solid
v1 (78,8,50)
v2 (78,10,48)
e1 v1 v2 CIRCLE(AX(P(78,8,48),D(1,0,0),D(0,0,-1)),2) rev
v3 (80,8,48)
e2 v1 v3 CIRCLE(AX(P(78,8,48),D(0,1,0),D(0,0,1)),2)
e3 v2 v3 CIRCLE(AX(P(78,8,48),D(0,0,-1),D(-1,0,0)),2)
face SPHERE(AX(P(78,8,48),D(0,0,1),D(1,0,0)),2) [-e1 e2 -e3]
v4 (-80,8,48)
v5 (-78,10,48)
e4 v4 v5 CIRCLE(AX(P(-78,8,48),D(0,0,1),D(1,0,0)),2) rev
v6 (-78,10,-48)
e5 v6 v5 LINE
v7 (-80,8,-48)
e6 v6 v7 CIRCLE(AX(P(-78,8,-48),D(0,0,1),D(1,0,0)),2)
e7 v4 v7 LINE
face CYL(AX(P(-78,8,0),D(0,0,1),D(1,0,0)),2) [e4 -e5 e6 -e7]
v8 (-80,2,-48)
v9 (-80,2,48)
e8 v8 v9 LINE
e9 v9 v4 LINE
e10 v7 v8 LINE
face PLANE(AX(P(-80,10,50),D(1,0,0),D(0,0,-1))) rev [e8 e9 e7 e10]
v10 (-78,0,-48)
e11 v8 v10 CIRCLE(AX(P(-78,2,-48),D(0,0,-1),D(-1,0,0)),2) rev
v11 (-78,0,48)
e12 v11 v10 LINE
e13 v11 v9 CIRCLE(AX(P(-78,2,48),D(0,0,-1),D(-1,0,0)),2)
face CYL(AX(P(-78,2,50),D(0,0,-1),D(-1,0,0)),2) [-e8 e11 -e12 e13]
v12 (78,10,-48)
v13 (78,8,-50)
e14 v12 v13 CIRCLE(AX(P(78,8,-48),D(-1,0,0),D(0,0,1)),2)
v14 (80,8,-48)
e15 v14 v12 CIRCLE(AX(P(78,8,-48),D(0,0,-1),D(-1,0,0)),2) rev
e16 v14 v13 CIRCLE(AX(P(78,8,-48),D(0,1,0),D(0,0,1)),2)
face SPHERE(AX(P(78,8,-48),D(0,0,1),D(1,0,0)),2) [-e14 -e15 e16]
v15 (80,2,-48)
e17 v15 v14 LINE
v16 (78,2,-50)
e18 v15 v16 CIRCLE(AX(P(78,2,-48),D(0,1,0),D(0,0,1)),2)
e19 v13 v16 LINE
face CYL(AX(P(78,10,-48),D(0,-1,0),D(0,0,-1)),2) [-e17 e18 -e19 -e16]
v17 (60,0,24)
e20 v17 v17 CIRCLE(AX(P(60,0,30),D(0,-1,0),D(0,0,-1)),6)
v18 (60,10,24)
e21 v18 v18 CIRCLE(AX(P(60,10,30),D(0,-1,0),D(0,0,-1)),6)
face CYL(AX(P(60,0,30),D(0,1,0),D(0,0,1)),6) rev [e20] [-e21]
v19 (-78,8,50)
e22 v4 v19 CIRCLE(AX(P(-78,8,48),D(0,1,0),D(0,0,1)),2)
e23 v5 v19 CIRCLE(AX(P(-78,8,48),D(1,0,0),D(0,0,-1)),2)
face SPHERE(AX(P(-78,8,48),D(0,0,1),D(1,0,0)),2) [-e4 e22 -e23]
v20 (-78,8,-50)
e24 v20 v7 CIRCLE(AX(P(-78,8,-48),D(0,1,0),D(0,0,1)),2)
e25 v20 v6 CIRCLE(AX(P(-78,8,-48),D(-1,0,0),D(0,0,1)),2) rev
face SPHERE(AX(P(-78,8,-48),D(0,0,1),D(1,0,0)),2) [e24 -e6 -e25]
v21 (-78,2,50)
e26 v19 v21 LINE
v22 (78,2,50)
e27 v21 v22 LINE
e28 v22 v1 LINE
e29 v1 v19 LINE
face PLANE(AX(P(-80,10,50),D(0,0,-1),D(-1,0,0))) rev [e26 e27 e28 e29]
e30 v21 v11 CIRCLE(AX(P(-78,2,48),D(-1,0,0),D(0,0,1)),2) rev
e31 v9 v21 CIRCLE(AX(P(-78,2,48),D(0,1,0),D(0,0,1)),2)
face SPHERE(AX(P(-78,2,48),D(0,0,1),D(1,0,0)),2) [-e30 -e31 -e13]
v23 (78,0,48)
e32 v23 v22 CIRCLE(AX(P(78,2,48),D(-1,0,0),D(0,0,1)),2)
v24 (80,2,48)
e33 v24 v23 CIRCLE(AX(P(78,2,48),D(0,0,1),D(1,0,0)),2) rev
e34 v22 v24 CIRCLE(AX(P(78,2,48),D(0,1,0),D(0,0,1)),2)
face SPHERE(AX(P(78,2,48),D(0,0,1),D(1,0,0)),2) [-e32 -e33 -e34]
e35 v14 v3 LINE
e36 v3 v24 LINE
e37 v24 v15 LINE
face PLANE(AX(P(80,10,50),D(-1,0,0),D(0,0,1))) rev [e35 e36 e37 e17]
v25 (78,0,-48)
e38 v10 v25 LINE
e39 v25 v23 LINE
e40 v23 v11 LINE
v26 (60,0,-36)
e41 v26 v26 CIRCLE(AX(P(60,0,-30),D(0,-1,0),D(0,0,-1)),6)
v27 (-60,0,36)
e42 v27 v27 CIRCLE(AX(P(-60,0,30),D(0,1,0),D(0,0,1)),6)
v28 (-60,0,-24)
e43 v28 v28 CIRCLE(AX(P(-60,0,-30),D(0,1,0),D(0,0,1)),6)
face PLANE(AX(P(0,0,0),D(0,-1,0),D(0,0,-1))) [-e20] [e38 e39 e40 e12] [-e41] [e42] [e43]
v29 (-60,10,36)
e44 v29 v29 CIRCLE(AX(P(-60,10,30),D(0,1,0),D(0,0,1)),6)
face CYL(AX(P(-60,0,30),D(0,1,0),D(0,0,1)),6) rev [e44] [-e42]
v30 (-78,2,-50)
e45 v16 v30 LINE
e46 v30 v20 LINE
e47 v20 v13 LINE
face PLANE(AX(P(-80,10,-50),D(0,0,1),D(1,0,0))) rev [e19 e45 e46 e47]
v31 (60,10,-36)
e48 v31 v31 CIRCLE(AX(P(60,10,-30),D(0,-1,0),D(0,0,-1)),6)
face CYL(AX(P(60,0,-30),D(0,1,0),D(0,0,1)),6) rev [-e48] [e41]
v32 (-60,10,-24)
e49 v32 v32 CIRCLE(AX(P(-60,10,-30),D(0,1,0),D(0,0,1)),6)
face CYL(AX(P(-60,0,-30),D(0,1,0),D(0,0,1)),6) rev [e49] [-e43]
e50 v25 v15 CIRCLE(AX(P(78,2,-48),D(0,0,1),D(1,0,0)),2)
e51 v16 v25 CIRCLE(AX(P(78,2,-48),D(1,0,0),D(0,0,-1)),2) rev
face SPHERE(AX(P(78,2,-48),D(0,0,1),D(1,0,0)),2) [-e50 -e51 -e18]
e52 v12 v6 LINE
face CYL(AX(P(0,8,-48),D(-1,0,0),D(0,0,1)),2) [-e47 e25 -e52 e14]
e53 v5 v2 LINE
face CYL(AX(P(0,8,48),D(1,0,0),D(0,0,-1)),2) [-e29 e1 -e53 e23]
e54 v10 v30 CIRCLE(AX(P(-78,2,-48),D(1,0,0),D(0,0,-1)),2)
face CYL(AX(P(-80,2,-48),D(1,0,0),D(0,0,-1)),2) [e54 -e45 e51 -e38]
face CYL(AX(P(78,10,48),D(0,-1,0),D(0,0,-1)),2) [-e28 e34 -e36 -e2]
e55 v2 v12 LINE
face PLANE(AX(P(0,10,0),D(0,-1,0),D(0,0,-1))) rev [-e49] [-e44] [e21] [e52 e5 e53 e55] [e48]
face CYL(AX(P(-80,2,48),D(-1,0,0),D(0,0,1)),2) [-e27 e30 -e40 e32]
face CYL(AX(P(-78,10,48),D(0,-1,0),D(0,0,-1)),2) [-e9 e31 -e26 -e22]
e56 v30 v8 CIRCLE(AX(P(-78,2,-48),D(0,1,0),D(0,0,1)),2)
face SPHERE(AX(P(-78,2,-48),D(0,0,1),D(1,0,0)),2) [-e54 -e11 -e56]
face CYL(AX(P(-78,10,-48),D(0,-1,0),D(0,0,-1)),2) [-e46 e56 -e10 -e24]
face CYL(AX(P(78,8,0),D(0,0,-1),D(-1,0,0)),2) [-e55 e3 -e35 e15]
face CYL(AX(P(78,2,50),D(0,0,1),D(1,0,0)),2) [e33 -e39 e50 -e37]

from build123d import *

# Parameters (mm, degrees)
SKETCH1_W           = 160
SKETCH1_H           = 100
BOSS_EXTRUDE1_DEPTH = 10
SKETCH2_R           = 6
CUT_EXTRUDE1_DEPTH  = 95.868329805
FILLET1_R           = 2
FILLET2_R           = 2
FILLET3_R           = 2


with BuildPart() as part:
    # Sketch1 → Boss-Extrude1 (new body)
    with BuildSketch(Plane(origin=(0, 0, 0), x_dir=(1, 0, 0), z_dir=(0, 1, 0))):
        Rectangle(SKETCH1_W, SKETCH1_H)
    extrude(amount=BOSS_EXTRUDE1_DEPTH)

    # Sketch2 → Cut-Extrude1 (cut, through all)
    with BuildSketch(Plane(origin=(0, 10, 0), x_dir=(1, 0, 0), z_dir=(0, 1, 0))):
        with Locations(Location((-60, 30, 0), (0, 0, 270))):
            Circle(SKETCH2_R)
        with Locations(Location((-60, -30, 0), (0, 0, 270))):
            Circle(SKETCH2_R)
        with Locations(Location((60, -30, 0), (0, 0, 90))):
            Circle(SKETCH2_R)
        with Locations(Location((60, 30, 0), (0, 0, 90))):
            Circle(SKETCH2_R)
    extrude(amount=-CUT_EXTRUDE1_DEPTH, mode=Mode.SUBTRACT)

    # Fillet1
    fillet1_edges = [part.edges().sort_by_distance(p)[0] for p in [
        (-80, 10, 0),
        (0, 10, 50),
        (80, 10, 0),
        (0, 10, -50),
    ]]
    fillet(fillet1_edges, radius=FILLET1_R)

    # Fillet2
    fillet2_edges = [part.edges().sort_by_distance(p)[0] for p in [
        (0, 0, 50),
        (-80, 0, 0),
        (0, 0, -50),
        (80, 0, 0),
    ]]
    fillet(fillet2_edges, radius=FILLET2_R)

    # Fillet3
    # the kernel refuses this fillet: 2 mm, written as the material it takes off along each edge
    with BuildSketch(Plane(origin=(-78, 8, 48), x_dir=(-1, 0, 0), z_dir=(0, 0, 1))) as fillet3_piece_1_section:
        Polygon((0, 0), (FILLET3_R, 0), (FILLET3_R, -FILLET3_R), (0, -FILLET3_R), align=None)
    fillet3_piece_1 = extrude(amount=FILLET3_R, mode=Mode.PRIVATE)
    fillet3_piece_1 = fillet3_piece_1 - Plane(origin=(-78, 8, 48), x_dir=(0.7071067811865475, -0.7071067811865475, 0), z_dir=(0, 0, 1)) * Sphere(FILLET3_R, mode=Mode.PRIVATE)
    add(fillet3_piece_1, mode=Mode.SUBTRACT)
    with BuildSketch(Plane(origin=(-78, 8, -48), x_dir=(0, 0, -1), z_dir=(-1, 0, 0))) as fillet3_piece_2_section:
        Polygon((0, 0), (FILLET3_R, 0), (FILLET3_R, -FILLET3_R), (0, -FILLET3_R), align=None)
    fillet3_piece_2 = extrude(amount=FILLET3_R, mode=Mode.PRIVATE)
    fillet3_piece_2 = fillet3_piece_2 - Plane(origin=(-78, 8, -48), x_dir=(0, -0.7071067811865475, 0.7071067811865475), z_dir=(-1, 0, 0)) * Sphere(FILLET3_R, mode=Mode.PRIVATE)
    add(fillet3_piece_2, mode=Mode.SUBTRACT)
    with BuildSketch(Plane(origin=(78, 8, 48), x_dir=(1, 0, 0), z_dir=(0, 0, 1))) as fillet3_piece_3_section:
        Polygon((0, 0), (FILLET3_R, 0), (FILLET3_R, FILLET3_R), (0, FILLET3_R), align=None)
    fillet3_piece_3 = extrude(amount=FILLET3_R, mode=Mode.PRIVATE)
    fillet3_piece_3 = fillet3_piece_3 - Plane(origin=(78, 8, 48), x_dir=(-0.7071067811865475, -0.7071067811865475, 0), z_dir=(0, 0, 1)) * Sphere(FILLET3_R, mode=Mode.PRIVATE)
    add(fillet3_piece_3, mode=Mode.SUBTRACT)
    with BuildSketch(Plane(origin=(78, 8, -48), x_dir=(0, 0, -1), z_dir=(1, 0, 0))) as fillet3_piece_4_section:
        Polygon((0, 0), (FILLET3_R, 0), (FILLET3_R, FILLET3_R), (0, FILLET3_R), align=None)
    fillet3_piece_4 = extrude(amount=FILLET3_R, mode=Mode.PRIVATE)
    fillet3_piece_4 = fillet3_piece_4 - Plane(origin=(78, 8, -48), x_dir=(0, -0.7071067811865475, 0.7071067811865475), z_dir=(1, 0, 0)) * Sphere(FILLET3_R, mode=Mode.PRIVATE)
    add(fillet3_piece_4, mode=Mode.SUBTRACT)
    with BuildSketch(Plane(origin=(-78, 2, 48), x_dir=(-1, 0, 0), z_dir=(0, 0, 1))) as fillet3_piece_5_section:
        Polygon((0, 0), (FILLET3_R, 0), (FILLET3_R, FILLET3_R), (0, FILLET3_R), align=None)
    fillet3_piece_5 = extrude(amount=FILLET3_R, mode=Mode.PRIVATE)
    fillet3_piece_5 = fillet3_piece_5 - Plane(origin=(-78, 2, 48), x_dir=(0.7071067811865475, 0.7071067811865475, 0), z_dir=(0, 0, 1)) * Sphere(FILLET3_R, mode=Mode.PRIVATE)
    add(fillet3_piece_5, mode=Mode.SUBTRACT)
    with BuildSketch(Plane(origin=(-78, 2, -48), x_dir=(0, 0, -1), z_dir=(-1, 0, 0))) as fillet3_piece_6_section:
        Polygon((0, 0), (FILLET3_R, 0), (FILLET3_R, FILLET3_R), (0, FILLET3_R), align=None)
    fillet3_piece_6 = extrude(amount=FILLET3_R, mode=Mode.PRIVATE)
    fillet3_piece_6 = fillet3_piece_6 - Plane(origin=(-78, 2, -48), x_dir=(0, 0.7071067811865475, 0.7071067811865475), z_dir=(-1, 0, 0)) * Sphere(FILLET3_R, mode=Mode.PRIVATE)
    add(fillet3_piece_6, mode=Mode.SUBTRACT)
    with BuildSketch(Plane(origin=(78, 2, 48), x_dir=(1, 0, 0), z_dir=(0, 0, 1))) as fillet3_piece_7_section:
        Polygon((0, 0), (FILLET3_R, 0), (FILLET3_R, -FILLET3_R), (0, -FILLET3_R), align=None)
    fillet3_piece_7 = extrude(amount=FILLET3_R, mode=Mode.PRIVATE)
    fillet3_piece_7 = fillet3_piece_7 - Plane(origin=(78, 2, 48), x_dir=(-0.7071067811865475, 0.7071067811865475, 0), z_dir=(0, 0, 1)) * Sphere(FILLET3_R, mode=Mode.PRIVATE)
    add(fillet3_piece_7, mode=Mode.SUBTRACT)
    with BuildSketch(Plane(origin=(78, 2, -48), x_dir=(0, 0, -1), z_dir=(1, 0, 0))) as fillet3_piece_8_section:
        Polygon((0, 0), (FILLET3_R, 0), (FILLET3_R, -FILLET3_R), (0, -FILLET3_R), align=None)
    fillet3_piece_8 = extrude(amount=FILLET3_R, mode=Mode.PRIVATE)
    fillet3_piece_8 = fillet3_piece_8 - Plane(origin=(78, 2, -48), x_dir=(0, 0.7071067811865475, 0.7071067811865475), z_dir=(1, 0, 0)) * Sphere(FILLET3_R, mode=Mode.PRIVATE)
    add(fillet3_piece_8, mode=Mode.SUBTRACT)
    with BuildSketch(Plane(origin=(80, 2, -50), x_dir=(0, 0, 1), z_dir=(0, 1, 0)), Plane(origin=(80, 2, 50), x_dir=(-1, 0, 0), z_dir=(0, 1, 0))) as fillet3_piece_9:
        with BuildLine():
            CenterArc((FILLET3_R, -FILLET3_R), FILLET3_R, 90, 90)
            Line((0, -FILLET3_R), (0, 0))
            Line((0, 0), (FILLET3_R, 0))
        make_face()
    extrude(amount=6, mode=Mode.SUBTRACT)
    with BuildSketch(Plane(origin=(-80, 2, 50), x_dir=(1, 0, 0), z_dir=(0, 1, 0)), Plane(origin=(-80, 2, -50), x_dir=(0, 0, 1), z_dir=(0, 1, 0))) as fillet3_piece_10:
        with BuildLine():
            CenterArc((FILLET3_R, FILLET3_R), FILLET3_R, 180, 90)
            Line((0, FILLET3_R), (0, 0))
            Line((0, 0), (FILLET3_R, 0))
        make_face()
    extrude(amount=6, mode=Mode.SUBTRACT)


solid = part.part
